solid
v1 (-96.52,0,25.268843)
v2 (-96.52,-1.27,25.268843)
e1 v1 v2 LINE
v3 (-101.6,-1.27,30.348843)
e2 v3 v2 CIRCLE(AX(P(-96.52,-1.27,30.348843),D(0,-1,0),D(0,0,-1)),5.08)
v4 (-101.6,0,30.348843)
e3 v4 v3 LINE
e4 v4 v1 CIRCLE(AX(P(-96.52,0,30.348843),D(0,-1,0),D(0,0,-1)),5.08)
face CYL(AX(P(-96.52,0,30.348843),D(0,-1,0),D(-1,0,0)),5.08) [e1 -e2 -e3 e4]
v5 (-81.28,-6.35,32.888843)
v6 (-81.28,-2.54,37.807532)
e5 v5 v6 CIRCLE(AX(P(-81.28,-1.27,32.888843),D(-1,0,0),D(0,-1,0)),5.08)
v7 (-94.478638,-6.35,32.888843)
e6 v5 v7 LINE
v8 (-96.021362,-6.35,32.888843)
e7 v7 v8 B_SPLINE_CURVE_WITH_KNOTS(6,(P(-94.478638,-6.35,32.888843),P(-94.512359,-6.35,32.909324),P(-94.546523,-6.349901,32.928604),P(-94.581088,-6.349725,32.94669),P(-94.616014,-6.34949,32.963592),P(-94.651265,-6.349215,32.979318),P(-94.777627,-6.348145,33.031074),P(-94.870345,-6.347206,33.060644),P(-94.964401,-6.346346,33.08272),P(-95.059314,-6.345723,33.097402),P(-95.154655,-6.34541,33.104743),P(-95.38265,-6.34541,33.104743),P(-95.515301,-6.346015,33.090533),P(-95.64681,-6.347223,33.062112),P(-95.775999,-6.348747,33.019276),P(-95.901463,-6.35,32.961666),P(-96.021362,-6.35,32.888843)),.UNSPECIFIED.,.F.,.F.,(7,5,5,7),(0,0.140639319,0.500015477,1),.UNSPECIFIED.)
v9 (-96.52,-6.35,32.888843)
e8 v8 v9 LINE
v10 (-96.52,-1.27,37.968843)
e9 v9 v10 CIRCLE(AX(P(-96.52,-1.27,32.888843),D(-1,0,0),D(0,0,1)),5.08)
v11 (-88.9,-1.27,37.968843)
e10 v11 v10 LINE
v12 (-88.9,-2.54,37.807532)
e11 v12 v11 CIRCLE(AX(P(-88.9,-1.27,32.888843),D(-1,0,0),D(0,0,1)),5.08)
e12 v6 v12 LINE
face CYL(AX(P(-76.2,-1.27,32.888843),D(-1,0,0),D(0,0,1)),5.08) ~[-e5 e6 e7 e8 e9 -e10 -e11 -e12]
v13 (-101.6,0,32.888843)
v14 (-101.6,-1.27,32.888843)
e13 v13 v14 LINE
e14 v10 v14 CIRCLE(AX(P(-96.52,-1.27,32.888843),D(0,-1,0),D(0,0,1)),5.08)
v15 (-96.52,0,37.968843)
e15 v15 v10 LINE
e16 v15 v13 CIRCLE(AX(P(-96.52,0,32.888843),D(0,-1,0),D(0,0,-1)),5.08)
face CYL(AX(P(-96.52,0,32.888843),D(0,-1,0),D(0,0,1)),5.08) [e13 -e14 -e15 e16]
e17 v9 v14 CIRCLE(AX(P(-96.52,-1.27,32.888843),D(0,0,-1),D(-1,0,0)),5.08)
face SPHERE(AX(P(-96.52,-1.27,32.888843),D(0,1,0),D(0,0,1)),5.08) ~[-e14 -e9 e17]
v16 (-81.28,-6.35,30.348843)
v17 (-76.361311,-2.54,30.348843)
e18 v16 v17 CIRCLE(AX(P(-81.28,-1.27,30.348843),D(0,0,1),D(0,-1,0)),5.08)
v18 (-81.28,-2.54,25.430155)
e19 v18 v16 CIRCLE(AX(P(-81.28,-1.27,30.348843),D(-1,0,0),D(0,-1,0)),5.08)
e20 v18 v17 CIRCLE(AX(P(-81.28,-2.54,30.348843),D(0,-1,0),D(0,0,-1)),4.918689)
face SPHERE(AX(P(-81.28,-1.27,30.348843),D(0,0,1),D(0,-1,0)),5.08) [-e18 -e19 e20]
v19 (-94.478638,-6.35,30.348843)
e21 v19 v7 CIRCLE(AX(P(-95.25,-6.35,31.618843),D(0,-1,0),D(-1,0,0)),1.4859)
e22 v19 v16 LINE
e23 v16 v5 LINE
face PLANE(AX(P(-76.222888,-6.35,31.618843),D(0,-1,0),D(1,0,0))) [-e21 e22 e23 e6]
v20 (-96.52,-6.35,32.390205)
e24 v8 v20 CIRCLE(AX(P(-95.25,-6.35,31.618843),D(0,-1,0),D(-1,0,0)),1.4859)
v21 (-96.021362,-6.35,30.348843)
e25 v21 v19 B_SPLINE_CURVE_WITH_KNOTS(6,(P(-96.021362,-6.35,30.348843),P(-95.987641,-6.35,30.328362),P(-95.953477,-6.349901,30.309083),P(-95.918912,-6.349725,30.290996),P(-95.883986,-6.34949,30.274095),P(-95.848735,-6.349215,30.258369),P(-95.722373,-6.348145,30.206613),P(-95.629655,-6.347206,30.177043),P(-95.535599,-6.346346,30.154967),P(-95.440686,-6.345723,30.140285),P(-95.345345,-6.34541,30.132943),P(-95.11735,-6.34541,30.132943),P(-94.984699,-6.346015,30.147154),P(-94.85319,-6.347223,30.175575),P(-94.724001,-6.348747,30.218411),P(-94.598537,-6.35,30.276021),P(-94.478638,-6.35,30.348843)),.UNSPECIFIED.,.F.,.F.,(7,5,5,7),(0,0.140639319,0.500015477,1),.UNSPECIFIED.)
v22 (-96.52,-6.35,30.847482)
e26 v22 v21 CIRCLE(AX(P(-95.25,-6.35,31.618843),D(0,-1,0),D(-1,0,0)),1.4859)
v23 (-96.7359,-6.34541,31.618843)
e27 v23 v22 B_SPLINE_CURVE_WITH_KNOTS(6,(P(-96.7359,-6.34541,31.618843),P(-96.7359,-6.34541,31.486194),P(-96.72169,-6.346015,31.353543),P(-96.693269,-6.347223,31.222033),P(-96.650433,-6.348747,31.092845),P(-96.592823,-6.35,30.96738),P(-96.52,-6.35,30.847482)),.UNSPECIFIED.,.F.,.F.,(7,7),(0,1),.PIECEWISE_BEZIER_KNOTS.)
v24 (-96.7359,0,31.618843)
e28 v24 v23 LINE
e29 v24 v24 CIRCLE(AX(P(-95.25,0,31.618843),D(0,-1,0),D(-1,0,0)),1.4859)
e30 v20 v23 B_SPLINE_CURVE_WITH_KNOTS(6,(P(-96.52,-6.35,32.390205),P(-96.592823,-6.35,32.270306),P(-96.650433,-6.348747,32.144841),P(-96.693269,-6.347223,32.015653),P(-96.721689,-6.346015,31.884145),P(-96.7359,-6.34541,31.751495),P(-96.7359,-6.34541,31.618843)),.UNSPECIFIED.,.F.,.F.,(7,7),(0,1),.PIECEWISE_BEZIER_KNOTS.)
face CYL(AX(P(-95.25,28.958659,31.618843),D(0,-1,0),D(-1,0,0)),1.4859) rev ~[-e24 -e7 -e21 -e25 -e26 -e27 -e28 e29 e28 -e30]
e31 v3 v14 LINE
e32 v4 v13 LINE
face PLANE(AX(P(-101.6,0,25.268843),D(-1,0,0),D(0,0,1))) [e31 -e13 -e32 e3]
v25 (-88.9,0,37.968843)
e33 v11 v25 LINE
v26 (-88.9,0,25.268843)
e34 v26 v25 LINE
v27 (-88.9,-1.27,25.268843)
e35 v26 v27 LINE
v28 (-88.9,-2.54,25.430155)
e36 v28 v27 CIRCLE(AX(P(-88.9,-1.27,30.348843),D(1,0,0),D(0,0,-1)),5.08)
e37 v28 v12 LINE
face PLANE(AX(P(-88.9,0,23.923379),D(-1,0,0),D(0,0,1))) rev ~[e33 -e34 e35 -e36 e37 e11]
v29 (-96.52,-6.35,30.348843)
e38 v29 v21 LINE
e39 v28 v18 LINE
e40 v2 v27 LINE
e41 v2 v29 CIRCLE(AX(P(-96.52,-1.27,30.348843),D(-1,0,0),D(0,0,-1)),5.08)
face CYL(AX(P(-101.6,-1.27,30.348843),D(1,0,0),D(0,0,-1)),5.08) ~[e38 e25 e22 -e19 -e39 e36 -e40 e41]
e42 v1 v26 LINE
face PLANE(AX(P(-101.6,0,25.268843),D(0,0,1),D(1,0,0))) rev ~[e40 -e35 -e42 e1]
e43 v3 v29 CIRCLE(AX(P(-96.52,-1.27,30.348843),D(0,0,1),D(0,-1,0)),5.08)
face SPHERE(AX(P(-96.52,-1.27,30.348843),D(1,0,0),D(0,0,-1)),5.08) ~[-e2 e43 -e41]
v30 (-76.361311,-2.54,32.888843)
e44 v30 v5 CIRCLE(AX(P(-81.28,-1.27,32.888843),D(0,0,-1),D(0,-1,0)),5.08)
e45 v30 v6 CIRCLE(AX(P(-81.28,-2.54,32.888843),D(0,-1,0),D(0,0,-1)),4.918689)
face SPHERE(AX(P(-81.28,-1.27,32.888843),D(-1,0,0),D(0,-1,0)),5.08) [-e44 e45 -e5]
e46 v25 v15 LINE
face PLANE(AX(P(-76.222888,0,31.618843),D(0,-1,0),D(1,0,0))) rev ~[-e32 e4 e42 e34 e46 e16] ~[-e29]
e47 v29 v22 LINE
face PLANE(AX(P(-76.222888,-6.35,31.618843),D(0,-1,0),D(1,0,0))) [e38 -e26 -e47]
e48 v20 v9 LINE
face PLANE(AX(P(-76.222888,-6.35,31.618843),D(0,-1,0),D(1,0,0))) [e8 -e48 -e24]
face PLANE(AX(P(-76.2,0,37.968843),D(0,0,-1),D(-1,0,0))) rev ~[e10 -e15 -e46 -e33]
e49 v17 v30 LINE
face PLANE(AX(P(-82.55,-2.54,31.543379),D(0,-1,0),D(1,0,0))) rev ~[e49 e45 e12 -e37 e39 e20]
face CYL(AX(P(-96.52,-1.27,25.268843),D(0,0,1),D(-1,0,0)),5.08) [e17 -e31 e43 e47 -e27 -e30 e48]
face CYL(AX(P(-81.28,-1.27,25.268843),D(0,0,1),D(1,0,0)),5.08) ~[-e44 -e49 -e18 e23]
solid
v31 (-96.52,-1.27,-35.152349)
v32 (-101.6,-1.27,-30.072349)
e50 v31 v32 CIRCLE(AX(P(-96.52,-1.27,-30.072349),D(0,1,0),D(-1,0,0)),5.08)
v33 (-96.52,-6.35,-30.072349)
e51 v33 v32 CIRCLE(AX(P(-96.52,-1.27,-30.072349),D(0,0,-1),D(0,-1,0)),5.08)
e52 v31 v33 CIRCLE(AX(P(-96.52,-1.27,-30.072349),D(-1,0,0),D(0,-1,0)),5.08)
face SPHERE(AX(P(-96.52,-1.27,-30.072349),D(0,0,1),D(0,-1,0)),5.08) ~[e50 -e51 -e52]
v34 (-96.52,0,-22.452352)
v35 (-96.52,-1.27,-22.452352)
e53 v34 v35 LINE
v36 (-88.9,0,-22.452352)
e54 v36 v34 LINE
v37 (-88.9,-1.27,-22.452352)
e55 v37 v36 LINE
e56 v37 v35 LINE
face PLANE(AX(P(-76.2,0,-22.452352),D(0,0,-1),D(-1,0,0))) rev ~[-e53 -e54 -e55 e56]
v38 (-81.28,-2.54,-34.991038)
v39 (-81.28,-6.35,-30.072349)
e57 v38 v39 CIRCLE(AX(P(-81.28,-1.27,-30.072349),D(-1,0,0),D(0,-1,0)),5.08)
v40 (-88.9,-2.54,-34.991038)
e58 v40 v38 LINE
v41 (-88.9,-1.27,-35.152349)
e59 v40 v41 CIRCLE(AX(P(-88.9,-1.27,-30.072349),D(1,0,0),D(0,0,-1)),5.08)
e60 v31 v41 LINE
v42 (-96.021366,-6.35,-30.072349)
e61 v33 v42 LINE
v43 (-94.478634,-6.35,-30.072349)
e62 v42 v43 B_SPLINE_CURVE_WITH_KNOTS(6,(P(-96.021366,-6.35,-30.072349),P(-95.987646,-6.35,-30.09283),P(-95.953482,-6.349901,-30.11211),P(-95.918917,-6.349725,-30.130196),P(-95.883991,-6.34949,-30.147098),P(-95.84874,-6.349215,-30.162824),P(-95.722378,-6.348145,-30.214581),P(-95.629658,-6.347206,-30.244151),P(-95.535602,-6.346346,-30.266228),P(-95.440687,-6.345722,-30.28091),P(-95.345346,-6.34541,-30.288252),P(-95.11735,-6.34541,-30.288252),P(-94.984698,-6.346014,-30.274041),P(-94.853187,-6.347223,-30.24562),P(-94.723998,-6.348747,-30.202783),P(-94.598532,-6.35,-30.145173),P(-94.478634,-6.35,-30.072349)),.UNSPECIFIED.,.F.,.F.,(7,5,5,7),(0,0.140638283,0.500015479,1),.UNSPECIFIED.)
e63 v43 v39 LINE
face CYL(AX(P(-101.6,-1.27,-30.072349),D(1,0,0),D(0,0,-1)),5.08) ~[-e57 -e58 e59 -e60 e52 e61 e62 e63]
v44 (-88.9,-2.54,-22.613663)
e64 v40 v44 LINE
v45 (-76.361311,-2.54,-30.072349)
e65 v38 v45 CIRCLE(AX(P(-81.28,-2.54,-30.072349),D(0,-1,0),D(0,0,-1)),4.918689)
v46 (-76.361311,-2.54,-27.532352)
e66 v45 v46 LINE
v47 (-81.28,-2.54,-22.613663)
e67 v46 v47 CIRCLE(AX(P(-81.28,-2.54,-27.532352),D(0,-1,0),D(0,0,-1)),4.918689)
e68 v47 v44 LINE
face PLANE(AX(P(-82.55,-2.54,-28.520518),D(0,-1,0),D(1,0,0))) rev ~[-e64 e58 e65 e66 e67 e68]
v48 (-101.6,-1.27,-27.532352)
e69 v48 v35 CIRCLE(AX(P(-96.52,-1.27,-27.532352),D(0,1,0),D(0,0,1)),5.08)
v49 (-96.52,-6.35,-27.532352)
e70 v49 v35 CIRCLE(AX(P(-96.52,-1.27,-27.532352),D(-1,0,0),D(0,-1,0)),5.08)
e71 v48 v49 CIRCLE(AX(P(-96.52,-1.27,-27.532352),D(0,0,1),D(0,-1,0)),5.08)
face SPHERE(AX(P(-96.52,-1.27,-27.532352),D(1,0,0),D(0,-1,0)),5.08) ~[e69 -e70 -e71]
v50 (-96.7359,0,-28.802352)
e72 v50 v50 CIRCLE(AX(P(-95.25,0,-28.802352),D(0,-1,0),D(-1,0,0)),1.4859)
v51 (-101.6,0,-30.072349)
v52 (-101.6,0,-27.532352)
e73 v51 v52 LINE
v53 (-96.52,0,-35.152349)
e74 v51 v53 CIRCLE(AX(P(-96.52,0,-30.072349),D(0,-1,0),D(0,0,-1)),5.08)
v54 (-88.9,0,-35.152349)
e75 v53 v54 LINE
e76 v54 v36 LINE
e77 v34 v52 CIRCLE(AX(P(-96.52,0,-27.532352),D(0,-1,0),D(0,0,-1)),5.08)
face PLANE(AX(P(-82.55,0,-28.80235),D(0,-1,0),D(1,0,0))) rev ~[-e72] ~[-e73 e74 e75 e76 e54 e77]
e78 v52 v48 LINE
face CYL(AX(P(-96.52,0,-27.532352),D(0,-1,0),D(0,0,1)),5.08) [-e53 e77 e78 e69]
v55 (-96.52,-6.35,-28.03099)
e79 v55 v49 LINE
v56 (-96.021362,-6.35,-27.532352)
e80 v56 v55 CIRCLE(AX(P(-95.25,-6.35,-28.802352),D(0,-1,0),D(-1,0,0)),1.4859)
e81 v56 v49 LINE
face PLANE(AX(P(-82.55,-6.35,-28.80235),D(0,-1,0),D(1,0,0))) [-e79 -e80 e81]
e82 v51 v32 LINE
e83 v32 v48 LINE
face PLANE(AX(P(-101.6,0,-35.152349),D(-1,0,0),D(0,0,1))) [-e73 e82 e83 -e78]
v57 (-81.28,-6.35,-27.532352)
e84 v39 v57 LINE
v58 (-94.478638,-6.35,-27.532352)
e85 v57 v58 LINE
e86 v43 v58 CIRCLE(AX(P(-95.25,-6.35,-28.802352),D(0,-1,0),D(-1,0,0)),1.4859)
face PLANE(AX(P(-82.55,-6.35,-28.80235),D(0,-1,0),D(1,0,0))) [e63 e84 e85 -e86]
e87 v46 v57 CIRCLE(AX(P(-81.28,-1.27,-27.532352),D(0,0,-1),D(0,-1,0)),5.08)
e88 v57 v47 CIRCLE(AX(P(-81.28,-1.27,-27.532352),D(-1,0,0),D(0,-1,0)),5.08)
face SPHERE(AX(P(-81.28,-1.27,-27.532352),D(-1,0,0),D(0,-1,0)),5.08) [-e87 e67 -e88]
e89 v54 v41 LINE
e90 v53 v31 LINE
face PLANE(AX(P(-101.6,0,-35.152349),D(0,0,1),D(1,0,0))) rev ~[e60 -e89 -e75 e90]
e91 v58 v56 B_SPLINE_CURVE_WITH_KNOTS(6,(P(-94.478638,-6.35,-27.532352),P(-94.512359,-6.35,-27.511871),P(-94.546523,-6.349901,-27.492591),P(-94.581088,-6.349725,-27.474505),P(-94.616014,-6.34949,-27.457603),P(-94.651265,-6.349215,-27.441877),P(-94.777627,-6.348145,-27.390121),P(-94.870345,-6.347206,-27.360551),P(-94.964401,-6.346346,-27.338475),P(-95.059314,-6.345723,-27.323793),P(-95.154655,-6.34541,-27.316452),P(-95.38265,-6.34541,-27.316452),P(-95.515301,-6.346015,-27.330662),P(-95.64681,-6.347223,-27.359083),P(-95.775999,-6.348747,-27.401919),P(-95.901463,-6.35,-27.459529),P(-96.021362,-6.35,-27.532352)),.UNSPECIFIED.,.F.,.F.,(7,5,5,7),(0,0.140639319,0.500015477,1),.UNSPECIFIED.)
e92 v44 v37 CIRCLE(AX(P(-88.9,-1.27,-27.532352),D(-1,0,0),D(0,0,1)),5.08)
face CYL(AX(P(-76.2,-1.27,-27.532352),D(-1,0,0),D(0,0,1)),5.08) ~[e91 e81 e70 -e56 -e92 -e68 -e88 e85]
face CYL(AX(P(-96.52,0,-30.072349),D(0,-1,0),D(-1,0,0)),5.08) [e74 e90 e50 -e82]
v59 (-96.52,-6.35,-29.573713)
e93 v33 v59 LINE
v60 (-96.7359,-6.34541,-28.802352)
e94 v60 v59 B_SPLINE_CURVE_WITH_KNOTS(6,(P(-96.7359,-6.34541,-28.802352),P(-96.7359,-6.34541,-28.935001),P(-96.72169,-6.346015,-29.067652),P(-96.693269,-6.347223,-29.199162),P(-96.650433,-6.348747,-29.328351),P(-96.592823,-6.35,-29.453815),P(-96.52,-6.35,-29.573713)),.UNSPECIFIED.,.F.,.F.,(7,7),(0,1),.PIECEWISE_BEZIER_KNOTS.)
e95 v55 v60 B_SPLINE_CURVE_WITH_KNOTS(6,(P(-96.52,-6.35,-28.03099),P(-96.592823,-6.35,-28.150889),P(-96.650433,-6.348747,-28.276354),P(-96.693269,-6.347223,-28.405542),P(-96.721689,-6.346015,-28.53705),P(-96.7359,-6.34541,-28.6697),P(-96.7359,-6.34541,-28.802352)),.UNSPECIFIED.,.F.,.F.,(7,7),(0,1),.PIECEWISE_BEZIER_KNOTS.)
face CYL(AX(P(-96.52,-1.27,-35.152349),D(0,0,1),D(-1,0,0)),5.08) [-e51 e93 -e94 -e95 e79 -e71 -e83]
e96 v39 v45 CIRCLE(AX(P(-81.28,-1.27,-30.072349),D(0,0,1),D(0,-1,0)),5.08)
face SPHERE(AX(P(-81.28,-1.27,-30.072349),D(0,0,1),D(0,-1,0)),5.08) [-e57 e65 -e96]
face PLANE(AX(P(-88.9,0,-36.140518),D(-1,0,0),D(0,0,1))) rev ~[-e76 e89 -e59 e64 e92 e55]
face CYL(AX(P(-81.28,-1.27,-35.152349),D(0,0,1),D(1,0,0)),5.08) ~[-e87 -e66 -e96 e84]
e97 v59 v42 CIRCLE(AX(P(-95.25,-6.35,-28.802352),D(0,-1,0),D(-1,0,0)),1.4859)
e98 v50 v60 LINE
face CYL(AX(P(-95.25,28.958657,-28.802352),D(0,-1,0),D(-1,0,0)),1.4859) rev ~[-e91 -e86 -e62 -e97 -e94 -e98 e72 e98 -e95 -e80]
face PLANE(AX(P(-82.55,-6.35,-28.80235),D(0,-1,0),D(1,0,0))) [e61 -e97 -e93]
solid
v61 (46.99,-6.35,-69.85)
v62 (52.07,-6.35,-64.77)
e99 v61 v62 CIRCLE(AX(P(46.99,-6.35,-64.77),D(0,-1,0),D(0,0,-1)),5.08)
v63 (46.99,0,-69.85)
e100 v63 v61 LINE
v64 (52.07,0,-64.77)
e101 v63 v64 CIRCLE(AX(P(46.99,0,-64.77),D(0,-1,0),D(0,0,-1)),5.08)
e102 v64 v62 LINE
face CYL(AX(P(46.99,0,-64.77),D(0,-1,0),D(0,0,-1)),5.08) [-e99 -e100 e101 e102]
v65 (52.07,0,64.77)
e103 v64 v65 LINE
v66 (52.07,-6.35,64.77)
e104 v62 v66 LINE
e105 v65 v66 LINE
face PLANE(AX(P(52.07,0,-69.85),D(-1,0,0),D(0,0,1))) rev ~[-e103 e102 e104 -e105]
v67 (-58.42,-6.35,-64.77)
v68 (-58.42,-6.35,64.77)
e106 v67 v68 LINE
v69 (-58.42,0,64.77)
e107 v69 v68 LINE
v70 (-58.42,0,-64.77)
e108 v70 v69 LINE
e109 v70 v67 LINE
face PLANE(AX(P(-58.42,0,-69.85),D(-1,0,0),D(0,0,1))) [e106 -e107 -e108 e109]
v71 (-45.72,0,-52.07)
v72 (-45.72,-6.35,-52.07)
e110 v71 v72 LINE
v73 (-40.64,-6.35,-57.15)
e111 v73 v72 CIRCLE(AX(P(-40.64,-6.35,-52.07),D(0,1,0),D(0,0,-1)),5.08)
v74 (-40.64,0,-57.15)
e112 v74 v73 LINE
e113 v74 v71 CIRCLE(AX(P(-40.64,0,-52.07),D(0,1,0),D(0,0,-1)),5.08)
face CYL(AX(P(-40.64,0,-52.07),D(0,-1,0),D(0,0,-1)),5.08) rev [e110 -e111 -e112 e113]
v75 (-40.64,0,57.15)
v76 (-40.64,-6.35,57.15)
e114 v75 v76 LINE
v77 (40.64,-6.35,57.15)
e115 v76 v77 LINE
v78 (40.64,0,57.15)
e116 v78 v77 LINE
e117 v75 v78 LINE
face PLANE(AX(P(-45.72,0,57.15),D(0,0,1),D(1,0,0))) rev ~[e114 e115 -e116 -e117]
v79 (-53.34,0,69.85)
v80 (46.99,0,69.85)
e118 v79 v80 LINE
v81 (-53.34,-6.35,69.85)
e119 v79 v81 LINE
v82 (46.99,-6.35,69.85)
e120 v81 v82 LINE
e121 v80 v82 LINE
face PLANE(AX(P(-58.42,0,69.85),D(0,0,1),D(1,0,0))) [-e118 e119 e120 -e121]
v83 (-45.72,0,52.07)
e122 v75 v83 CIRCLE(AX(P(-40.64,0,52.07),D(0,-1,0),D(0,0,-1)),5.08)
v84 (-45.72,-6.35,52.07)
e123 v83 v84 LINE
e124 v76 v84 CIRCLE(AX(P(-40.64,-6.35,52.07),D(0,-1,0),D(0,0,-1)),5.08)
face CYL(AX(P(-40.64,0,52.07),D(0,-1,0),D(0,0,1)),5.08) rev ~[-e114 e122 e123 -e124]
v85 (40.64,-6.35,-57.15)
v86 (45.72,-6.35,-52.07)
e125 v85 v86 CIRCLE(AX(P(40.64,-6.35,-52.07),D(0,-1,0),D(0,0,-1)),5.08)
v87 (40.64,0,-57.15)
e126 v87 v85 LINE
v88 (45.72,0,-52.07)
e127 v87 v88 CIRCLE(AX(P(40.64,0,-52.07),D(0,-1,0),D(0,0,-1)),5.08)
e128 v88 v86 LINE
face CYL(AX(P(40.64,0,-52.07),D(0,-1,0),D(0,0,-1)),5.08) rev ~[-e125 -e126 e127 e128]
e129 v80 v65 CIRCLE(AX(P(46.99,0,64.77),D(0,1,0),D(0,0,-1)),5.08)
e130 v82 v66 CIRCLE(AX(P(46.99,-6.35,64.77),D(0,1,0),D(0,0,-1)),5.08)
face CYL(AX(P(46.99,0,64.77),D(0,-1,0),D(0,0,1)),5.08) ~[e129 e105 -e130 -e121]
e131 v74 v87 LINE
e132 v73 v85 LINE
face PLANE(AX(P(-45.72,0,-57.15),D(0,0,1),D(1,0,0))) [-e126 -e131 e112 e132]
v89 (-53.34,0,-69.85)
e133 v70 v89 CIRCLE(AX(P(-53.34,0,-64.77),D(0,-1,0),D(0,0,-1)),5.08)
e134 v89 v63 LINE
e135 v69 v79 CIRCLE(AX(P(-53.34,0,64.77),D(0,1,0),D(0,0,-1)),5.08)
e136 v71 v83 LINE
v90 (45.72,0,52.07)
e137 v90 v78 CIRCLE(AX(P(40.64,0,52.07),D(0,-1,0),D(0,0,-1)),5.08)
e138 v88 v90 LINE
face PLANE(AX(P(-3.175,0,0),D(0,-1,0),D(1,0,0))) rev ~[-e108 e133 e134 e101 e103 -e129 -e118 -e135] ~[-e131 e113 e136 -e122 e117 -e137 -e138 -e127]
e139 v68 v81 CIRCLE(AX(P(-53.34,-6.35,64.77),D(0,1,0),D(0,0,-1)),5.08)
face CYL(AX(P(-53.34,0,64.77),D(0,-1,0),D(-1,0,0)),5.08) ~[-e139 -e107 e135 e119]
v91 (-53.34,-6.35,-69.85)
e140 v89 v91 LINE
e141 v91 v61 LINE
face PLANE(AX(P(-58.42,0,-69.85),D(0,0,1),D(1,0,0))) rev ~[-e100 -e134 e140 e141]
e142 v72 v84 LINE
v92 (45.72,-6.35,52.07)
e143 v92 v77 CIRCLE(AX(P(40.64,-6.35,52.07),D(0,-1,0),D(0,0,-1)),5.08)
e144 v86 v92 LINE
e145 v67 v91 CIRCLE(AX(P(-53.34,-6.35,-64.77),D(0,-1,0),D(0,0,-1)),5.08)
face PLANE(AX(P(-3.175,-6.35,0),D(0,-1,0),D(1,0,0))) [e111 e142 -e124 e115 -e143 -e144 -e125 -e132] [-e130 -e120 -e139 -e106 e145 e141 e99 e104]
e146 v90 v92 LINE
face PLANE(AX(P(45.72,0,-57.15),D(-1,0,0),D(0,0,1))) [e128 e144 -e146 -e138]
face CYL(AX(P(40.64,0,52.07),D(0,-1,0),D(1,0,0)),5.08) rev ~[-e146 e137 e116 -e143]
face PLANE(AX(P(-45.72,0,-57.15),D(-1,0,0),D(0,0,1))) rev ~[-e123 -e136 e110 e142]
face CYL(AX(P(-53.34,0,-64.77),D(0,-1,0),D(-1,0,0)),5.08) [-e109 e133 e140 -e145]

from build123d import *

# Parameters (mm, degrees)
F0_W     = 110.49
F0_H     = 139.7
F0_W_2   = 91.44
F0_H_2   = 114.3
F2_DEPTH = 6.35
F3_R     = 5.08
F1_W     = 0.0457762241
F1_H     = 12.7
F1_W_2   = 12.6542237759
F4_DEPTH = 6.35
F1_W_3   = 12.7
F1_H_2   = 12.6999970629
F5_R     = 5.08
F6_R     = 5.08
F7_W     = 12.7
F7_H     = 15.24
F8_DEPTH = 2.54
F9_DEPTH = 2.54
F11_D    = 2.9718
F12_D    = 2.9718


# Not quite as in the source:
# - a feature of the source that left no trace in its solid (it failed there, or was rolled back) is left out


with BuildPart() as f2:
    # F0 (on Front) → F2 (new body)
    with BuildSketch(Plane.XZ):
        with Locations((-3.175, 0)):
            Rectangle(F0_W, F0_H)
        Rectangle(F0_W_2, F0_H_2, mode=Mode.SUBTRACT)
    extrude(amount=F2_DEPTH)

    # F3
    f3_edges = [f2.edges().sort_by_distance(p)[0] for p in [
        (-58.42, -3.175, 69.85),
        (-58.42, -3.175, -69.85),
        (52.07, -3.175, -69.85),
        (52.07, -3.175, 69.85),
        (-45.72, -3.175, 57.15),
        (45.72, -3.175, 57.15),
        (45.72, -3.175, -57.15),
        (-45.72, -3.175, -57.15),
    ]]
    fillet(f3_edges, radius=F3_R)


with BuildPart() as f4:
    # F1 (on Front) → F4 (new body)
    with BuildSketch(Plane.XZ):
        with Locations((-76.2228881121, 31.618843414)):
            Rectangle(F1_W, F1_H)
        with Locations((-82.5728881121, 31.618843414)):
            Rectangle(F1_W_2, F1_H)
        with Locations((-88.9228881121, 31.618843414)):
            Rectangle(F1_W, F1_H)
        with Locations((-95.2728881121, 31.618843414)):
            Rectangle(F1_W_2, F1_H)
    extrude(amount=F4_DEPTH)

    # F5
    f5_edges = [f4.edges().sort_by_distance(p)[0] for p in [
        (-101.6, -3.175, 37.968843),
        (-88.9, -6.35, 37.968843),
        (-76.2, -6.35, 31.618843),
        (-88.9, -6.35, 25.268843),
        (-76.2, -3.175, 25.268843),
        (-101.6, -3.175, 25.268843),
        (-76.2, -3.175, 37.968843),
        (-101.6, -6.35, 31.618843),
    ]]
    fillet(f5_edges, radius=F5_R)

    # F7 (on Front) → F8 (cut)
    with BuildSketch(Plane.XZ):
        with Locations((-82.55, 31.543379275)):
            Rectangle(F7_W, F7_H)
    extrude(amount=F8_DEPTH, mode=Mode.SUBTRACT)

    # F11 (through all)
    with Locations(Plane(origin=(0, 0, 0), x_dir=(1, 0, 0), z_dir=(0, 1, 0))):
        with Locations((-95.25, -31.618843414)):
            Hole(F11_D / 2)


with BuildPart() as f4b:
    # F1 (on Front) → F4, piece 2 (new body)
    with BuildSketch(Plane.XZ):
        with Locations((-82.55, -28.8023503282)):
            Rectangle(F1_W_3, F1_H_2)
        with Locations((-95.25, -28.8023503282)):
            Rectangle(F1_W_3, F1_H_2)
    extrude(amount=F4_DEPTH)

    # F6
    f6_edges = [f4b.edges().sort_by_distance(p)[0] for p in [
        (-88.9, -6.35, -22.452352),
        (-76.2, -6.35, -28.80235),
        (-101.6, -6.35, -28.80235),
        (-88.9, -6.35, -35.152349),
        (-101.6, -3.175, -35.152349),
        (-101.6, -3.175, -22.452352),
        (-76.2, -3.175, -35.152349),
        (-76.2, -3.175, -22.452352),
    ]]
    fillet(f6_edges, radius=F6_R)

    # F7 (on Front) → F9 (cut)
    with BuildSketch(Plane.XZ):
        with Locations((-82.55, 31.543379275)):
            Rectangle(F7_W, F7_H)
        with Locations((-82.55, -28.520518263)):
            Rectangle(F7_W, F7_H)
    extrude(amount=F9_DEPTH, mode=Mode.SUBTRACT)

    # F12 (through all)
    with Locations(Plane(origin=(0, 0, 0), x_dir=(1, 0, 0), z_dir=(0, 1, 0))):
        with Locations((-95.25, 28.8023517968)):
            Hole(F12_D / 2)


solid = Compound([f2.part, f4.part, f4b.part])
